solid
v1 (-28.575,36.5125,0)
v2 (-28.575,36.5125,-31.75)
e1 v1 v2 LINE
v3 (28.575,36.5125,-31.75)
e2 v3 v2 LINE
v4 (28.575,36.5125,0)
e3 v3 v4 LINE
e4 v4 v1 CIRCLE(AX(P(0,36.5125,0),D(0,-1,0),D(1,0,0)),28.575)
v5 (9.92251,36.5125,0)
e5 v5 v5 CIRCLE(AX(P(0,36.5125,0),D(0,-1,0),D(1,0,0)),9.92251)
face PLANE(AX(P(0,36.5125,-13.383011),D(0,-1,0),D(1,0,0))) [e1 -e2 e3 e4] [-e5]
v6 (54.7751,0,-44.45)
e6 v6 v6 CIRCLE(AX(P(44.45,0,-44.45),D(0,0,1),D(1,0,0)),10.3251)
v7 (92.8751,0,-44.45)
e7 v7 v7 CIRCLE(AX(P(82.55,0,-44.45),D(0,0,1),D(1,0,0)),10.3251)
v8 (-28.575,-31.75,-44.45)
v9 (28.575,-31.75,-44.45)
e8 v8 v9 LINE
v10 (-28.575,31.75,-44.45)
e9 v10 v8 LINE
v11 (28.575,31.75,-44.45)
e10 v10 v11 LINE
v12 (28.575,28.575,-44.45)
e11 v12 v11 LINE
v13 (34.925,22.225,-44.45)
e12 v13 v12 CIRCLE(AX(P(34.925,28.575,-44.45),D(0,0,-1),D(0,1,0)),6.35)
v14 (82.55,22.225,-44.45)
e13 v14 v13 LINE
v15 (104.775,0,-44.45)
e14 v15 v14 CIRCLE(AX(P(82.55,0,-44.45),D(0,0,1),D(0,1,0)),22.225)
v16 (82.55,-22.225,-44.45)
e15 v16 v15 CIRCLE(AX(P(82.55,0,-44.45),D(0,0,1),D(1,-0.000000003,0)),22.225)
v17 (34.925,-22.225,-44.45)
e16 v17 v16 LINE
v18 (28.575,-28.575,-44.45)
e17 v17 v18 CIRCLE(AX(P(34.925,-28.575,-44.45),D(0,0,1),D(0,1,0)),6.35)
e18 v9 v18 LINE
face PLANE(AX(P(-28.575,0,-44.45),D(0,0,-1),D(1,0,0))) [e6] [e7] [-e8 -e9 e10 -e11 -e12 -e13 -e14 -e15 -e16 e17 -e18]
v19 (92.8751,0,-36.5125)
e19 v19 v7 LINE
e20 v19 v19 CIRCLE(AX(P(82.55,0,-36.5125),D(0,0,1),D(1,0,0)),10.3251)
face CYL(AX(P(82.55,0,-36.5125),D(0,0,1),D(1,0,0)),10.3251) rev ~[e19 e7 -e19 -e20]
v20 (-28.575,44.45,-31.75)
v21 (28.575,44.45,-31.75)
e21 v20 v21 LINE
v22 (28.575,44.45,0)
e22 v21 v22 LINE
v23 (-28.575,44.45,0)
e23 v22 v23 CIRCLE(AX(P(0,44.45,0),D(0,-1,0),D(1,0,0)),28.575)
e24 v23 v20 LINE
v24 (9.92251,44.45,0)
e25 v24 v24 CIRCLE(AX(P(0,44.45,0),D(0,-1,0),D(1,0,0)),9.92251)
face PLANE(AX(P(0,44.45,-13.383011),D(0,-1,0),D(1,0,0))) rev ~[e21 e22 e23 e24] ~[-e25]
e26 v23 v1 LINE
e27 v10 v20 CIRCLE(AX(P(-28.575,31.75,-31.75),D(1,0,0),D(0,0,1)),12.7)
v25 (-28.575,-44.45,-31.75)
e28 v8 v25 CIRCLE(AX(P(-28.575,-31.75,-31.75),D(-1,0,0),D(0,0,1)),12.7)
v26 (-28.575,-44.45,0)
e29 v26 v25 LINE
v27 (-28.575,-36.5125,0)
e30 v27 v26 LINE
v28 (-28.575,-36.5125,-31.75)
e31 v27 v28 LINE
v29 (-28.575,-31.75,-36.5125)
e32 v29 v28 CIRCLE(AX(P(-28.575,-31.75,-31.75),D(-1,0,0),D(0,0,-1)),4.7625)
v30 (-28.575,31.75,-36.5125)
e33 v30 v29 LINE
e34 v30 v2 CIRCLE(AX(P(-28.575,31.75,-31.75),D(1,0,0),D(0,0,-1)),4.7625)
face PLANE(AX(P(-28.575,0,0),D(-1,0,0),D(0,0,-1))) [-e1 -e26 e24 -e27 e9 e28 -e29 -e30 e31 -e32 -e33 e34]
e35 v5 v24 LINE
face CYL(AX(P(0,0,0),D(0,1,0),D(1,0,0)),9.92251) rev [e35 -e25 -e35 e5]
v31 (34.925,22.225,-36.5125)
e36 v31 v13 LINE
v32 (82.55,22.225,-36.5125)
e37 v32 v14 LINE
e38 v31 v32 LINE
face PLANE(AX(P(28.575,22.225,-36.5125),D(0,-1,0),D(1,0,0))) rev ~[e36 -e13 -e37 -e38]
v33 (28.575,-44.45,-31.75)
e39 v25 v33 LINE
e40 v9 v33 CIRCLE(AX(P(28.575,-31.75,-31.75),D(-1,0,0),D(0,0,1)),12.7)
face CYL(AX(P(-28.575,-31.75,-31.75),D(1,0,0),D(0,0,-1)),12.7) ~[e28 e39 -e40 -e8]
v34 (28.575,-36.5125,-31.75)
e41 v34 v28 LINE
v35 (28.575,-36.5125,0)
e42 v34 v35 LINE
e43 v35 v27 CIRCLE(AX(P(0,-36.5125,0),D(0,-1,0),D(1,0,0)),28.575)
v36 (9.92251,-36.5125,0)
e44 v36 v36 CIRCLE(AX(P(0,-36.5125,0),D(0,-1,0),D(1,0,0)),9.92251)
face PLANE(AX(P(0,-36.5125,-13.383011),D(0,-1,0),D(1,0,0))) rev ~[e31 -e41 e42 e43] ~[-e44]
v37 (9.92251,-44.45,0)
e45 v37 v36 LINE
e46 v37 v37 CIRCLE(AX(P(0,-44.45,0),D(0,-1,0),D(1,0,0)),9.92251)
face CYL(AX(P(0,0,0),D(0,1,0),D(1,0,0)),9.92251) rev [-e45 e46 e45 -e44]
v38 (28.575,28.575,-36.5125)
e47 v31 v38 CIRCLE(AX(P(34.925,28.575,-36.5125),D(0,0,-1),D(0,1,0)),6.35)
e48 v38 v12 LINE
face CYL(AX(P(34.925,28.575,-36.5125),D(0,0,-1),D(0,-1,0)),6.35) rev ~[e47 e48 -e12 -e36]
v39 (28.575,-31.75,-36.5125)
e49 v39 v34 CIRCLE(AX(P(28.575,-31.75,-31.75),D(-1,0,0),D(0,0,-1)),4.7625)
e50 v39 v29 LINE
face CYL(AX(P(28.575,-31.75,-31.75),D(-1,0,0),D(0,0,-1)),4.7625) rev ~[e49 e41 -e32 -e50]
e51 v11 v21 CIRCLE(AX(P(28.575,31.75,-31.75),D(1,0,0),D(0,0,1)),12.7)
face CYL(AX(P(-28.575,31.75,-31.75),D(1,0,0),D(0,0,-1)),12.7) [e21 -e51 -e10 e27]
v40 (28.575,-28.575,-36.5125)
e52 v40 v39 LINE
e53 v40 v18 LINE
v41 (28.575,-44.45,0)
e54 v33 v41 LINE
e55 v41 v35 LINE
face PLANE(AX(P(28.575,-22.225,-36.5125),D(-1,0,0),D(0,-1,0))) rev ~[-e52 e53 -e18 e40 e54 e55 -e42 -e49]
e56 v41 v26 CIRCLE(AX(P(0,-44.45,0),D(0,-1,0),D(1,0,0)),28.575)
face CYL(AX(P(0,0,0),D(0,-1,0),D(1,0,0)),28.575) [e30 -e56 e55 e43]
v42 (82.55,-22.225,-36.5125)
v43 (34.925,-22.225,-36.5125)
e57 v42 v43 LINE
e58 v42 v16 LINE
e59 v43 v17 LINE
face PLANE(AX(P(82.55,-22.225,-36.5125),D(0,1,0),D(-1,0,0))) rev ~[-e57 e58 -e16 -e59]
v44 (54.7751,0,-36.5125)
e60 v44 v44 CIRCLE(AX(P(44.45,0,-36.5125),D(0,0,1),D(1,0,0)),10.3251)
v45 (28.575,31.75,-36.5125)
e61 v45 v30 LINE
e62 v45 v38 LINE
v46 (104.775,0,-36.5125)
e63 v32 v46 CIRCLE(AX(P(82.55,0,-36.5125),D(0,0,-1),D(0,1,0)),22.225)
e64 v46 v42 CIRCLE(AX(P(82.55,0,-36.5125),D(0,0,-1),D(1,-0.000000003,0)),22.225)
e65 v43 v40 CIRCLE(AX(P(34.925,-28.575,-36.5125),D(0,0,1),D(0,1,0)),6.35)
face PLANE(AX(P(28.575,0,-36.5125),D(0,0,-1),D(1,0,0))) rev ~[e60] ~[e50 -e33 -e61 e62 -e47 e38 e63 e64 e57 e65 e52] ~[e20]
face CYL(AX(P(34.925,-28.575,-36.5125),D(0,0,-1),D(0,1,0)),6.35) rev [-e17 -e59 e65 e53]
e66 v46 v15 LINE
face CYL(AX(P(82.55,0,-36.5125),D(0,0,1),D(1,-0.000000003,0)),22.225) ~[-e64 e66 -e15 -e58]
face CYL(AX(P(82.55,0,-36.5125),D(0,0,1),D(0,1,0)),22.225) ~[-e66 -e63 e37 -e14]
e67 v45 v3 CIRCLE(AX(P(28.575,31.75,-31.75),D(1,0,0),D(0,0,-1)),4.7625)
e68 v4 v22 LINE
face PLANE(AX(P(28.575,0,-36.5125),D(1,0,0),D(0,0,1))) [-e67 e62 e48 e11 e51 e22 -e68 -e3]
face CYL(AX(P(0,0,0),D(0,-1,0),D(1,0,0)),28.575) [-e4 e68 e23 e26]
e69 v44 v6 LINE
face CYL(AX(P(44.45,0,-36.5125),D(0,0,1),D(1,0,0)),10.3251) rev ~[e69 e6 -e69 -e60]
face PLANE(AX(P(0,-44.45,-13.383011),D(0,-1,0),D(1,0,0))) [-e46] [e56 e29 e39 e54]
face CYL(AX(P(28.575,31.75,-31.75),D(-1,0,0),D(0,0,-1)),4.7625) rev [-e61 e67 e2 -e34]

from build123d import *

# Parameters (mm, degrees)
F0_R     = 9.92251
F0_W     = 76.2
F0_H     = 7.9375
F1_DEPTH = 44.45
F2_T     = 7.9375
F3_R     = 10.3251
F4_DEPTH = 7.9385
F5_R     = 6.35
F6_R     = 4.7625
F7_R     = 12.7


# Not quite as in the source:
# - a shell that OpenCascade refuses in one call is made with other operations: the cavity is built on its own and cut out


with BuildPart() as f1:
    # F0 (on Front) → F1 (new body, symmetric)
    with BuildSketch(Plane.XZ):
        with BuildLine():
            ThreePointArc((28.575, 0), (0, 28.575), (-28.575, 0))
            Line((-28.575, 0), (-28.575, -44.45))
            Line((-28.575, -44.45), (28.575, -44.45))
            Line((28.575, -44.45), (28.575, -36.5125))
            Line((28.575, -36.5125), (28.575, 0))
        make_face()
        Circle(F0_R, mode=Mode.SUBTRACT)
        with Locations((66.675, -40.48125)):
            Rectangle(F0_W, F0_H)
    extrude(amount=F1_DEPTH, both=True)

    # F2: shell of thickness 7.9375, made by hand


with BuildPart() as f2_core1:
    # F2_t2: copy of F1
    add(f1.part)

    # the walls: a layer under each face that stays
    f2_faces = [f2_core1.faces().sort_by_distance(p)[0] for p in [
        (66.675, 0, -36.5125),
        (104.775, 0, -40.48125),
        (38.1, 0, -44.45),
        (-6.35, -44.45, -32.2791666667),
        (-6.35, 44.45, -32.2791666667),
    ]]
    thicken(f2_faces, amount=-F2_T, mode=Mode.SUBTRACT)


with BuildPart() as f1_1:
    add(f1.part)

    # what is left inside the walls is the cavity
    f2_cavity = [f2_core1.part.solids().sort_by_distance(p)[0] for p in [
        (0, 12.170833, 28.495625),
    ]]
    add(f2_cavity, mode=Mode.SUBTRACT)

    # F3 (on face) → F4 (cut, through all)
    with BuildSketch(Plane.XY.offset(-36.5125)):
        with Locations((44.45, 0)):
            Circle(F3_R)
        with Locations((82.55, 0)):
            Circle(F3_R)
        with BuildLine():
            Line((104.775, -44.45), (104.775, -6.98e-08))
            ThreePointArc((104.775, -6.98e-08), (98.2654481872, -15.7154482366), (82.55, -22.225))
            Line((82.55, -22.225), (28.575, -22.225))
            Line((28.575, -22.225), (28.575, -44.45))
            Line((28.575, -44.45), (104.775, -44.45))
        make_face()
        with BuildLine():
            Line((28.575, 22.225), (82.55, 22.225))
            ThreePointArc((82.55, 22.225), (98.2654482366, 15.7154481872), (104.775, -6.98e-08))
            Line((104.775, -6.98e-08), (104.775, 44.45))
            Line((104.775, 44.45), (28.575, 44.45))
            Line((28.575, 44.45), (28.575, 22.225))
        make_face()
    extrude(amount=-F4_DEPTH, mode=Mode.SUBTRACT)

    # F5
    f5_edges = [f1_1.edges().sort_by_distance(p)[0] for p in [
        (28.575, -22.225, -40.48125),
        (28.575, 22.225, -40.48125),
    ]]
    fillet(f5_edges, radius=F5_R)

    # F6
    f6_edges = [f1_1.edges().sort_by_distance(p)[0] for p in [
        (0, -36.5125, -36.5125),
        (0, 36.5125, -36.5125),
    ]]
    fillet(f6_edges, radius=F6_R)

    # F7
    f7_edges = [f1_1.edges().sort_by_distance(p)[0] for p in [
        (0, -44.45, -44.45),
        (0, 44.45, -44.45),
    ]]
    fillet(f7_edges, radius=F7_R)


solid = f1_1.part
